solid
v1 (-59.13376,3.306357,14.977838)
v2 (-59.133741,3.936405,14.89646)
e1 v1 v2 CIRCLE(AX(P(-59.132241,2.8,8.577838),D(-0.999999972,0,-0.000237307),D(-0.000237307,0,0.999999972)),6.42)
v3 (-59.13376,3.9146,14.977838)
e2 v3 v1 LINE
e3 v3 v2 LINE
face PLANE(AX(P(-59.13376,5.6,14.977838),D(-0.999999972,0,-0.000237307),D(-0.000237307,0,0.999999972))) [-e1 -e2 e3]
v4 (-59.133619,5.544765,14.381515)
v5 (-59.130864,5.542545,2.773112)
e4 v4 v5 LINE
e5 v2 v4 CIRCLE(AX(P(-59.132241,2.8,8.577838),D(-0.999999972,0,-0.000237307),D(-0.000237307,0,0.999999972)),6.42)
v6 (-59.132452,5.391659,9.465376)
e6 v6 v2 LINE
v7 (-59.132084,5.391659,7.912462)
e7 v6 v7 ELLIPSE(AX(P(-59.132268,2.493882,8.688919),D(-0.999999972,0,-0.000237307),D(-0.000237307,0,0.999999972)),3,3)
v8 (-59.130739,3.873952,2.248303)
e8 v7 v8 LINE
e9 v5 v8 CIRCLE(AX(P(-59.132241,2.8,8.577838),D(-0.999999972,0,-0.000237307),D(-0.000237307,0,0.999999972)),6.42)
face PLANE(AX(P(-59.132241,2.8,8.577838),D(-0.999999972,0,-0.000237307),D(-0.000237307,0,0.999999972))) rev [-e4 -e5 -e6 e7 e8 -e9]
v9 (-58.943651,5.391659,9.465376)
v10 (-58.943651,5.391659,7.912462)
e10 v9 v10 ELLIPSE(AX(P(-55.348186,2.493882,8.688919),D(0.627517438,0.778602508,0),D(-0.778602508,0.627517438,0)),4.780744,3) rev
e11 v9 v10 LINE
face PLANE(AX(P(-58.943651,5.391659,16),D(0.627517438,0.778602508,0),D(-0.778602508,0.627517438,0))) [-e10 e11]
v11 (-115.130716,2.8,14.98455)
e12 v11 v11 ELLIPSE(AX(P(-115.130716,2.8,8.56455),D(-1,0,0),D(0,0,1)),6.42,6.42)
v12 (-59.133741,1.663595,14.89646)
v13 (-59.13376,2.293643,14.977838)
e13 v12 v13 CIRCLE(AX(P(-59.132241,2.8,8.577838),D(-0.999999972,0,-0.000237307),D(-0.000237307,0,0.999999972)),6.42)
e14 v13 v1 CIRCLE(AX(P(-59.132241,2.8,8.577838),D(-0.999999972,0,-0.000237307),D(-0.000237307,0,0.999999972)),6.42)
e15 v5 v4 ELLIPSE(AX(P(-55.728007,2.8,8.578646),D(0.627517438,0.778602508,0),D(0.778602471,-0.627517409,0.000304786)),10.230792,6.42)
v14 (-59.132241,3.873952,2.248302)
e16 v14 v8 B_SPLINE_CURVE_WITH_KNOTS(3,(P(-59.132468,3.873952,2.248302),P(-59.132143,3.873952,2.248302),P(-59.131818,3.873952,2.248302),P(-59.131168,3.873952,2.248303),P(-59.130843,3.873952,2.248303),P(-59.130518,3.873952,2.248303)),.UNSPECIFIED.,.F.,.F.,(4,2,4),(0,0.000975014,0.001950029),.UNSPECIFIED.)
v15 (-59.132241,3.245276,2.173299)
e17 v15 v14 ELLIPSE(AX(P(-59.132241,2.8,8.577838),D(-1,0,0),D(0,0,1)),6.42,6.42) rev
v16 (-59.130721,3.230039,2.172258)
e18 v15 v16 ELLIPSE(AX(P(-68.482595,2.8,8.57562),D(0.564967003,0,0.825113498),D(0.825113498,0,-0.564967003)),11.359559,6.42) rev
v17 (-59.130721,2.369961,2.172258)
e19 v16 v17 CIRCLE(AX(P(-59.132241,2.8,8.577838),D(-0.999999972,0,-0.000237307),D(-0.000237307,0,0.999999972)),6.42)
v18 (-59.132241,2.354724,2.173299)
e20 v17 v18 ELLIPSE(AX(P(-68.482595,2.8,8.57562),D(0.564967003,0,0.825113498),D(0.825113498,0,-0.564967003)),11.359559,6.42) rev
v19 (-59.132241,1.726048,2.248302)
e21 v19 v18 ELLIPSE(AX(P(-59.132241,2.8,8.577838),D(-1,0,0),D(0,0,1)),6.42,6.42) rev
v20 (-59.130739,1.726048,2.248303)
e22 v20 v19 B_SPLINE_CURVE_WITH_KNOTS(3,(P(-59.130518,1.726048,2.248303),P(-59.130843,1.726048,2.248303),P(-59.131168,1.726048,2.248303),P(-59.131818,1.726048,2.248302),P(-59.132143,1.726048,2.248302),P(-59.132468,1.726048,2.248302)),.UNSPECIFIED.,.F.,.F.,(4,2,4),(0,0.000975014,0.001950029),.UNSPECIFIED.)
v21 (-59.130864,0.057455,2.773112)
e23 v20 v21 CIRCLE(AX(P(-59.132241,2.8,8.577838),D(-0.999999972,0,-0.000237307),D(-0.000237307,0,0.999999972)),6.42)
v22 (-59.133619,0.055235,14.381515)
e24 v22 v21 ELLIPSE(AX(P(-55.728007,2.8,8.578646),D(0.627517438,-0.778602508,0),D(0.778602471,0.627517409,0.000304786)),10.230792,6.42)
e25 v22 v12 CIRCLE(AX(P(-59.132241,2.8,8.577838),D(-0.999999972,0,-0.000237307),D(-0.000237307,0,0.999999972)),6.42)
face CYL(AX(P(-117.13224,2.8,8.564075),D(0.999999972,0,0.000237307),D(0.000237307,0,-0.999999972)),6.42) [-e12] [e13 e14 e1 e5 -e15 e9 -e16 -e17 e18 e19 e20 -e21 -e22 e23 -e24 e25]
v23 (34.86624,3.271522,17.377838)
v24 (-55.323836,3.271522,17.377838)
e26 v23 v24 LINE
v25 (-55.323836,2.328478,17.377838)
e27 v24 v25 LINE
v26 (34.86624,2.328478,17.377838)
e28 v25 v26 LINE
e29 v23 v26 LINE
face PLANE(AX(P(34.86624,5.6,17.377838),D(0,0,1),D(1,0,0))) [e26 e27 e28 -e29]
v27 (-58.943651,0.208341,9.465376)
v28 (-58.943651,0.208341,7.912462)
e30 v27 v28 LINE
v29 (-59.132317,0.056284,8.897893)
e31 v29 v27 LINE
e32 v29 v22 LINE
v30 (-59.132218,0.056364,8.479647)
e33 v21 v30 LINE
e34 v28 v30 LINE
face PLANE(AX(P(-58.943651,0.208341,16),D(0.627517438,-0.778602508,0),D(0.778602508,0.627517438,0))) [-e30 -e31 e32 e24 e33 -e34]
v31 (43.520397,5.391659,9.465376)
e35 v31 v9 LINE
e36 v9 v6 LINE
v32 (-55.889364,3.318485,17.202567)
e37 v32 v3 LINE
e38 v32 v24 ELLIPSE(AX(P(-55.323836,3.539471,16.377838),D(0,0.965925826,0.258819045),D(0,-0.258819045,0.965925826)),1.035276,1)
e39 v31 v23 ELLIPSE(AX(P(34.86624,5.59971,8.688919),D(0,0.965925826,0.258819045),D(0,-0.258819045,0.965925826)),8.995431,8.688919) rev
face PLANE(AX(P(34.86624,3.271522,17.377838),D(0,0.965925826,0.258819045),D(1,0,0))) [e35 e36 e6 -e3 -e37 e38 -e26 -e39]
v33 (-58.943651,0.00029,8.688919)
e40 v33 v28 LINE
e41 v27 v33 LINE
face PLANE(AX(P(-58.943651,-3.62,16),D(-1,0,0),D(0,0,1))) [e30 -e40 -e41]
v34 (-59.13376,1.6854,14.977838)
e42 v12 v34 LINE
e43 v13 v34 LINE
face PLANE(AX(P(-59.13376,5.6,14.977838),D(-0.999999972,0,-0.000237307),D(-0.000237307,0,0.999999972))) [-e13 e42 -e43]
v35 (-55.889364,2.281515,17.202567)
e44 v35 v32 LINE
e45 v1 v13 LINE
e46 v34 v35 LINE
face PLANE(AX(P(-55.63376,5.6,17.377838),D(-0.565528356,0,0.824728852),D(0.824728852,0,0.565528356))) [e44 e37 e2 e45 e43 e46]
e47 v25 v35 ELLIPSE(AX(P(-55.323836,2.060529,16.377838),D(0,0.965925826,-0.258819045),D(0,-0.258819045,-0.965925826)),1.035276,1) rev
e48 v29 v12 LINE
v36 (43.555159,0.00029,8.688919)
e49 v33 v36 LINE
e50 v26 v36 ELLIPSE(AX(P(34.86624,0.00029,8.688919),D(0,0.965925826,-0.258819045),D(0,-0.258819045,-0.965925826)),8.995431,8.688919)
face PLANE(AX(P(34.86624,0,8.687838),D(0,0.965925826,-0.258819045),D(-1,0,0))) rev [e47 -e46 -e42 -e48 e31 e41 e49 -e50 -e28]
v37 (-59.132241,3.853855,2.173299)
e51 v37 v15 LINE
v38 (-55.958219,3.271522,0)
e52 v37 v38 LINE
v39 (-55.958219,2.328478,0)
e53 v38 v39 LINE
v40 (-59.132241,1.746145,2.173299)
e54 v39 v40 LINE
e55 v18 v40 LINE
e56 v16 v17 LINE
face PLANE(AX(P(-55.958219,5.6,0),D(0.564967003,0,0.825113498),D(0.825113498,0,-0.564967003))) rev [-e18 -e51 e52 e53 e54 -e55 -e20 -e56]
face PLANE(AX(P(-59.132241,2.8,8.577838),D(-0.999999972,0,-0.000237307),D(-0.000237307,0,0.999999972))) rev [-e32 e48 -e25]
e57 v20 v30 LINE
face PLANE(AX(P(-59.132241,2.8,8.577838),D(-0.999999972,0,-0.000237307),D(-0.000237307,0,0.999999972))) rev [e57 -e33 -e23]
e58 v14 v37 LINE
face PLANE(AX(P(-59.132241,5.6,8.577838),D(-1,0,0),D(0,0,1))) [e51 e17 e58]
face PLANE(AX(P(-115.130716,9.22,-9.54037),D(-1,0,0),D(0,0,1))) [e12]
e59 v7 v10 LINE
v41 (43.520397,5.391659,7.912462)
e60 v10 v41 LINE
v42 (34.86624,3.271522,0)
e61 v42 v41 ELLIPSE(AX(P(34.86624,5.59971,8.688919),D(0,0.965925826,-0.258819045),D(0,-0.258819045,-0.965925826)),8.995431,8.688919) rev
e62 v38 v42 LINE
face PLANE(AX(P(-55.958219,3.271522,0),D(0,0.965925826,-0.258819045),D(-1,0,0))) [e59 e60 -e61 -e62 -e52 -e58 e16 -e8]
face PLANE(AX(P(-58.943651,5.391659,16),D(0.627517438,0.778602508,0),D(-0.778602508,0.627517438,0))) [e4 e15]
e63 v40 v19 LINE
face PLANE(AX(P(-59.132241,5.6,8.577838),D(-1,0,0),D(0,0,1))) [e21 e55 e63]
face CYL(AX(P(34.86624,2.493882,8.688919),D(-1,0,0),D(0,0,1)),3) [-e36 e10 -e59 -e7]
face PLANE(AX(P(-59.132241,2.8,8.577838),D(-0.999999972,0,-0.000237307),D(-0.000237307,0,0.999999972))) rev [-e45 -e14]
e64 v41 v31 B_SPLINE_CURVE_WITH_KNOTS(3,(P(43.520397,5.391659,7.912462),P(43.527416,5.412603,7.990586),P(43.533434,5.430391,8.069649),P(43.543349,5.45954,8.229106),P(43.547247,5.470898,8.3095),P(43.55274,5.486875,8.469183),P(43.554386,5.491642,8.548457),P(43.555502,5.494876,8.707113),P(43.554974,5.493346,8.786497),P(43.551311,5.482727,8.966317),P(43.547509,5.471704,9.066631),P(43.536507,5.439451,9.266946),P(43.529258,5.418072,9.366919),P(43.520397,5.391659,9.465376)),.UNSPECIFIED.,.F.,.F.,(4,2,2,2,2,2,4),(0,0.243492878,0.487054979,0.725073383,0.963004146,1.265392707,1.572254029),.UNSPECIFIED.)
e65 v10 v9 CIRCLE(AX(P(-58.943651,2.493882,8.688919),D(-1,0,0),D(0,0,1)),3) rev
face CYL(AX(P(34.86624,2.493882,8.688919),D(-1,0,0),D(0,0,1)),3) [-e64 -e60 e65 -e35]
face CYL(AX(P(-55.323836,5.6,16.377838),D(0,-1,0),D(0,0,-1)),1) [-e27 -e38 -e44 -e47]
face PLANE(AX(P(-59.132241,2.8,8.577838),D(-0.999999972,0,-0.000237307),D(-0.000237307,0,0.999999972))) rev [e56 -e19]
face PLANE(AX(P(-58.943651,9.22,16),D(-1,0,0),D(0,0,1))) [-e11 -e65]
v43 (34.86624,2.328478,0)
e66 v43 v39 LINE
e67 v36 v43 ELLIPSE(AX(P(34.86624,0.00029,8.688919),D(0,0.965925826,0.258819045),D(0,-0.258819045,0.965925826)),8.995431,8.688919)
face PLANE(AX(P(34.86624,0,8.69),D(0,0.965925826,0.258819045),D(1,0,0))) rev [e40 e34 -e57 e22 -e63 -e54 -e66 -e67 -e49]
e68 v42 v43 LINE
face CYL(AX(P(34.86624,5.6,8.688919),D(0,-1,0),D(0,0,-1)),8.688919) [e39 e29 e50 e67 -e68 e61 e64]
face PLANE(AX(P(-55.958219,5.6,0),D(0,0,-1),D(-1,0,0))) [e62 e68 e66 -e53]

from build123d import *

# Parameters (mm, degrees)
BOSS_EXTRUDE2_DEPTH      = 5.6
CHAMFER2_SIZE            = 2.328478482
CHAMFER2_SIZE_2          = 8.69
CHAMFER3_SIZE            = 8.69
CHAMFER3_SIZE_2          = 2.328478482
CHAMFER4_SIZE            = 8.69
CHAMFER4_SIZE_2          = 2.328478482
CHAMFER5_SIZE            = 8.69
CHAMFER5_SIZE_2          = 2.328478482
FILLET1_R                = 1
SKETCH8_R                = 6.42
BOSS_EXTRUDE3_DEPTH      = 58
FILLET2_R                = 3
CUT_EXTRUDE12_DEPTH      = 16
CUT_EXTRUDE13_DEPTH      = 119.774223563
CUT_EXTRUDE13_DEPTH_BACK = 119.774223563
SKETCH19_W               = 4.551969905
SKETCH19_H               = 31.016999287


with BuildPart() as part:
    # Sketch3 → Boss-Extrude2 (new body)
    with BuildSketch(Plane(origin=(0, 0, 0), x_dir=(1, 0, 0), z_dir=(0, 1, 0))):
        with BuildLine():
            Line((-55.958218902, 0), (34.866239796, 0))
            ThreePointArc((34.866239796, 0), (43.555159042, -8.688919246), (34.866239796, -17.377838493))
            Line((34.866239796, -17.377838493), (-55.633760204, -17.377838493))
            Line((-55.633760204, -17.377838493), (-59.133760204, -14.977838493))
            Line((-59.133760204, -14.977838493), (-59.132241437, -8.577838493))
            Line((-59.132241437, -8.577838493), (-59.132241437, -2.173298587))
            Line((-59.132241437, -2.173298587), (-55.958218902, 0))
        make_face()
    extrude(amount=BOSS_EXTRUDE2_DEPTH)

    # Chamfer2
    # the kernel refuses this chamfer: 8.69, 2.328478482 mm, written as the material it takes off along each edge
    with BuildSketch(Plane(origin=(57.431750241, 5.6, 17.377838493), x_dir=(0, -0.9905000388259545, 0.13751244702128881), z_dir=(-1, 0, 0))) as chamfer2_piece_1:
        Polygon((CHAMFER2_SIZE * 0.990500038922, -CHAMFER2_SIZE * 0.137512447035), (-CHAMFER2_SIZE_2 * 0.137512447021, -CHAMFER2_SIZE_2 * 0.990500038826), (0, 0), align=None)
    extrude(amount=135.63102089, mode=Mode.SUBTRACT)

    # Chamfer3
    # the kernel refuses this chamfer: 8.69, 2.328478482 mm, written as the material it takes off along each edge
    with BuildSketch(Plane(origin=(57.431750241, 0, 17.377838493), x_dir=(0, -0.009967146577156423, -0.9999503267608394), z_dir=(-1, 0, 0))) as chamfer3_piece_1:
        Polygon((CHAMFER3_SIZE * 0.999950326761, -CHAMFER3_SIZE * 0.00996714657716), (-CHAMFER3_SIZE_2 * 0.00996714657813, -CHAMFER3_SIZE_2 * 0.999950326858), (0, 0), align=None)
    extrude(amount=135.63102089, mode=Mode.SUBTRACT)

    # Chamfer4
    # the kernel refuses this chamfer: 8.69, 2.328478482 mm, written as the material it takes off along each edge
    with BuildSketch(Plane(origin=(-78.523729347, 5.6, 0), x_dir=(0, 0.00996714657715643, 0.9999503267608394), z_dir=(1, 0, 0))) as chamfer4_piece_1:
        Polygon((CHAMFER4_SIZE * 0.999950326761, CHAMFER4_SIZE * 0.00996714657716), (-CHAMFER4_SIZE_2 * 0.00996714657813, CHAMFER4_SIZE_2 * 0.999950326858), (0, 0), align=None)
    extrude(amount=135.955479588, mode=Mode.SUBTRACT)

    # Chamfer5
    # the kernel refuses this chamfer: 8.69, 2.328478482 mm, written as the material it takes off along each edge
    with BuildSketch(Plane(origin=(-78.523729347, 0, 0), x_dir=(0, -0.009967146577156423, 0.9999503267608394), z_dir=(1, 0, 0))) as chamfer5_piece_1:
        Polygon((CHAMFER5_SIZE * 0.999950326761, -CHAMFER5_SIZE * 0.00996714657716), (-CHAMFER5_SIZE_2 * 0.00996714657813, -CHAMFER5_SIZE_2 * 0.999950326858), (0, 0), align=None)
    extrude(amount=135.955479588, mode=Mode.SUBTRACT)

    # Fillet1
    fillet1_edges = [part.edges().sort_by_distance(p)[0] for p in [
        (-55.633760204, 2.8, 17.377838493),
    ]]
    fillet(fillet1_edges, radius=FILLET1_R)

    # Sketch8 → Boss-Extrude3 (add)
    with BuildSketch(Plane(origin=(-59.130202523, 0, -0.014032034), x_dir=(-0.00023730738394525297, 0, 0.9999999718426024), z_dir=(-0.9999999718426024, 0, -0.00023730738394525297))):
        with Locations(Location((8.591870769, 2.8, 0), (0, 0, 183.840787638))):
            Circle(SKETCH8_R)
    extrude(amount=BOSS_EXTRUDE3_DEPTH)

    # Fillet2
    fillet2_edges = [part.edges().sort_by_distance(p)[0] for p in [
        (-7.788554378, 5.599710413, 8.688919246),
    ]]
    fillet(fillet2_edges, radius=FILLET2_R)

    # Sketch16 → Cut-Extrude12 (cut)
    with BuildSketch(Plane.XY):
        Polygon((-58.943650552, 9.22), (-63.693726721, 9.22), (-58.943650552, 5.391659351), align=None)
        Polygon((-58.943650552, -3.62), (-63.693726721, -3.62), (-58.943650552, 0.208340649), align=None)
    extrude(amount=CUT_EXTRUDE12_DEPTH, mode=Mode.SUBTRACT)

    # Sketch19 → Cut-Extrude13 (cut, two sides: drawn at the far end of the back side and taken through both)
    with BuildSketch(Plane(origin=(0, 0, 0), x_dir=(1, 0, 0), z_dir=(0, 1, 0)).offset(-CUT_EXTRUDE13_DEPTH_BACK)):
        with Locations((-117.406701244, -5.968129835)):
            Rectangle(SKETCH19_W, SKETCH19_H)
    extrude(amount=CUT_EXTRUDE13_DEPTH + CUT_EXTRUDE13_DEPTH_BACK, mode=Mode.SUBTRACT)


solid = part.part
